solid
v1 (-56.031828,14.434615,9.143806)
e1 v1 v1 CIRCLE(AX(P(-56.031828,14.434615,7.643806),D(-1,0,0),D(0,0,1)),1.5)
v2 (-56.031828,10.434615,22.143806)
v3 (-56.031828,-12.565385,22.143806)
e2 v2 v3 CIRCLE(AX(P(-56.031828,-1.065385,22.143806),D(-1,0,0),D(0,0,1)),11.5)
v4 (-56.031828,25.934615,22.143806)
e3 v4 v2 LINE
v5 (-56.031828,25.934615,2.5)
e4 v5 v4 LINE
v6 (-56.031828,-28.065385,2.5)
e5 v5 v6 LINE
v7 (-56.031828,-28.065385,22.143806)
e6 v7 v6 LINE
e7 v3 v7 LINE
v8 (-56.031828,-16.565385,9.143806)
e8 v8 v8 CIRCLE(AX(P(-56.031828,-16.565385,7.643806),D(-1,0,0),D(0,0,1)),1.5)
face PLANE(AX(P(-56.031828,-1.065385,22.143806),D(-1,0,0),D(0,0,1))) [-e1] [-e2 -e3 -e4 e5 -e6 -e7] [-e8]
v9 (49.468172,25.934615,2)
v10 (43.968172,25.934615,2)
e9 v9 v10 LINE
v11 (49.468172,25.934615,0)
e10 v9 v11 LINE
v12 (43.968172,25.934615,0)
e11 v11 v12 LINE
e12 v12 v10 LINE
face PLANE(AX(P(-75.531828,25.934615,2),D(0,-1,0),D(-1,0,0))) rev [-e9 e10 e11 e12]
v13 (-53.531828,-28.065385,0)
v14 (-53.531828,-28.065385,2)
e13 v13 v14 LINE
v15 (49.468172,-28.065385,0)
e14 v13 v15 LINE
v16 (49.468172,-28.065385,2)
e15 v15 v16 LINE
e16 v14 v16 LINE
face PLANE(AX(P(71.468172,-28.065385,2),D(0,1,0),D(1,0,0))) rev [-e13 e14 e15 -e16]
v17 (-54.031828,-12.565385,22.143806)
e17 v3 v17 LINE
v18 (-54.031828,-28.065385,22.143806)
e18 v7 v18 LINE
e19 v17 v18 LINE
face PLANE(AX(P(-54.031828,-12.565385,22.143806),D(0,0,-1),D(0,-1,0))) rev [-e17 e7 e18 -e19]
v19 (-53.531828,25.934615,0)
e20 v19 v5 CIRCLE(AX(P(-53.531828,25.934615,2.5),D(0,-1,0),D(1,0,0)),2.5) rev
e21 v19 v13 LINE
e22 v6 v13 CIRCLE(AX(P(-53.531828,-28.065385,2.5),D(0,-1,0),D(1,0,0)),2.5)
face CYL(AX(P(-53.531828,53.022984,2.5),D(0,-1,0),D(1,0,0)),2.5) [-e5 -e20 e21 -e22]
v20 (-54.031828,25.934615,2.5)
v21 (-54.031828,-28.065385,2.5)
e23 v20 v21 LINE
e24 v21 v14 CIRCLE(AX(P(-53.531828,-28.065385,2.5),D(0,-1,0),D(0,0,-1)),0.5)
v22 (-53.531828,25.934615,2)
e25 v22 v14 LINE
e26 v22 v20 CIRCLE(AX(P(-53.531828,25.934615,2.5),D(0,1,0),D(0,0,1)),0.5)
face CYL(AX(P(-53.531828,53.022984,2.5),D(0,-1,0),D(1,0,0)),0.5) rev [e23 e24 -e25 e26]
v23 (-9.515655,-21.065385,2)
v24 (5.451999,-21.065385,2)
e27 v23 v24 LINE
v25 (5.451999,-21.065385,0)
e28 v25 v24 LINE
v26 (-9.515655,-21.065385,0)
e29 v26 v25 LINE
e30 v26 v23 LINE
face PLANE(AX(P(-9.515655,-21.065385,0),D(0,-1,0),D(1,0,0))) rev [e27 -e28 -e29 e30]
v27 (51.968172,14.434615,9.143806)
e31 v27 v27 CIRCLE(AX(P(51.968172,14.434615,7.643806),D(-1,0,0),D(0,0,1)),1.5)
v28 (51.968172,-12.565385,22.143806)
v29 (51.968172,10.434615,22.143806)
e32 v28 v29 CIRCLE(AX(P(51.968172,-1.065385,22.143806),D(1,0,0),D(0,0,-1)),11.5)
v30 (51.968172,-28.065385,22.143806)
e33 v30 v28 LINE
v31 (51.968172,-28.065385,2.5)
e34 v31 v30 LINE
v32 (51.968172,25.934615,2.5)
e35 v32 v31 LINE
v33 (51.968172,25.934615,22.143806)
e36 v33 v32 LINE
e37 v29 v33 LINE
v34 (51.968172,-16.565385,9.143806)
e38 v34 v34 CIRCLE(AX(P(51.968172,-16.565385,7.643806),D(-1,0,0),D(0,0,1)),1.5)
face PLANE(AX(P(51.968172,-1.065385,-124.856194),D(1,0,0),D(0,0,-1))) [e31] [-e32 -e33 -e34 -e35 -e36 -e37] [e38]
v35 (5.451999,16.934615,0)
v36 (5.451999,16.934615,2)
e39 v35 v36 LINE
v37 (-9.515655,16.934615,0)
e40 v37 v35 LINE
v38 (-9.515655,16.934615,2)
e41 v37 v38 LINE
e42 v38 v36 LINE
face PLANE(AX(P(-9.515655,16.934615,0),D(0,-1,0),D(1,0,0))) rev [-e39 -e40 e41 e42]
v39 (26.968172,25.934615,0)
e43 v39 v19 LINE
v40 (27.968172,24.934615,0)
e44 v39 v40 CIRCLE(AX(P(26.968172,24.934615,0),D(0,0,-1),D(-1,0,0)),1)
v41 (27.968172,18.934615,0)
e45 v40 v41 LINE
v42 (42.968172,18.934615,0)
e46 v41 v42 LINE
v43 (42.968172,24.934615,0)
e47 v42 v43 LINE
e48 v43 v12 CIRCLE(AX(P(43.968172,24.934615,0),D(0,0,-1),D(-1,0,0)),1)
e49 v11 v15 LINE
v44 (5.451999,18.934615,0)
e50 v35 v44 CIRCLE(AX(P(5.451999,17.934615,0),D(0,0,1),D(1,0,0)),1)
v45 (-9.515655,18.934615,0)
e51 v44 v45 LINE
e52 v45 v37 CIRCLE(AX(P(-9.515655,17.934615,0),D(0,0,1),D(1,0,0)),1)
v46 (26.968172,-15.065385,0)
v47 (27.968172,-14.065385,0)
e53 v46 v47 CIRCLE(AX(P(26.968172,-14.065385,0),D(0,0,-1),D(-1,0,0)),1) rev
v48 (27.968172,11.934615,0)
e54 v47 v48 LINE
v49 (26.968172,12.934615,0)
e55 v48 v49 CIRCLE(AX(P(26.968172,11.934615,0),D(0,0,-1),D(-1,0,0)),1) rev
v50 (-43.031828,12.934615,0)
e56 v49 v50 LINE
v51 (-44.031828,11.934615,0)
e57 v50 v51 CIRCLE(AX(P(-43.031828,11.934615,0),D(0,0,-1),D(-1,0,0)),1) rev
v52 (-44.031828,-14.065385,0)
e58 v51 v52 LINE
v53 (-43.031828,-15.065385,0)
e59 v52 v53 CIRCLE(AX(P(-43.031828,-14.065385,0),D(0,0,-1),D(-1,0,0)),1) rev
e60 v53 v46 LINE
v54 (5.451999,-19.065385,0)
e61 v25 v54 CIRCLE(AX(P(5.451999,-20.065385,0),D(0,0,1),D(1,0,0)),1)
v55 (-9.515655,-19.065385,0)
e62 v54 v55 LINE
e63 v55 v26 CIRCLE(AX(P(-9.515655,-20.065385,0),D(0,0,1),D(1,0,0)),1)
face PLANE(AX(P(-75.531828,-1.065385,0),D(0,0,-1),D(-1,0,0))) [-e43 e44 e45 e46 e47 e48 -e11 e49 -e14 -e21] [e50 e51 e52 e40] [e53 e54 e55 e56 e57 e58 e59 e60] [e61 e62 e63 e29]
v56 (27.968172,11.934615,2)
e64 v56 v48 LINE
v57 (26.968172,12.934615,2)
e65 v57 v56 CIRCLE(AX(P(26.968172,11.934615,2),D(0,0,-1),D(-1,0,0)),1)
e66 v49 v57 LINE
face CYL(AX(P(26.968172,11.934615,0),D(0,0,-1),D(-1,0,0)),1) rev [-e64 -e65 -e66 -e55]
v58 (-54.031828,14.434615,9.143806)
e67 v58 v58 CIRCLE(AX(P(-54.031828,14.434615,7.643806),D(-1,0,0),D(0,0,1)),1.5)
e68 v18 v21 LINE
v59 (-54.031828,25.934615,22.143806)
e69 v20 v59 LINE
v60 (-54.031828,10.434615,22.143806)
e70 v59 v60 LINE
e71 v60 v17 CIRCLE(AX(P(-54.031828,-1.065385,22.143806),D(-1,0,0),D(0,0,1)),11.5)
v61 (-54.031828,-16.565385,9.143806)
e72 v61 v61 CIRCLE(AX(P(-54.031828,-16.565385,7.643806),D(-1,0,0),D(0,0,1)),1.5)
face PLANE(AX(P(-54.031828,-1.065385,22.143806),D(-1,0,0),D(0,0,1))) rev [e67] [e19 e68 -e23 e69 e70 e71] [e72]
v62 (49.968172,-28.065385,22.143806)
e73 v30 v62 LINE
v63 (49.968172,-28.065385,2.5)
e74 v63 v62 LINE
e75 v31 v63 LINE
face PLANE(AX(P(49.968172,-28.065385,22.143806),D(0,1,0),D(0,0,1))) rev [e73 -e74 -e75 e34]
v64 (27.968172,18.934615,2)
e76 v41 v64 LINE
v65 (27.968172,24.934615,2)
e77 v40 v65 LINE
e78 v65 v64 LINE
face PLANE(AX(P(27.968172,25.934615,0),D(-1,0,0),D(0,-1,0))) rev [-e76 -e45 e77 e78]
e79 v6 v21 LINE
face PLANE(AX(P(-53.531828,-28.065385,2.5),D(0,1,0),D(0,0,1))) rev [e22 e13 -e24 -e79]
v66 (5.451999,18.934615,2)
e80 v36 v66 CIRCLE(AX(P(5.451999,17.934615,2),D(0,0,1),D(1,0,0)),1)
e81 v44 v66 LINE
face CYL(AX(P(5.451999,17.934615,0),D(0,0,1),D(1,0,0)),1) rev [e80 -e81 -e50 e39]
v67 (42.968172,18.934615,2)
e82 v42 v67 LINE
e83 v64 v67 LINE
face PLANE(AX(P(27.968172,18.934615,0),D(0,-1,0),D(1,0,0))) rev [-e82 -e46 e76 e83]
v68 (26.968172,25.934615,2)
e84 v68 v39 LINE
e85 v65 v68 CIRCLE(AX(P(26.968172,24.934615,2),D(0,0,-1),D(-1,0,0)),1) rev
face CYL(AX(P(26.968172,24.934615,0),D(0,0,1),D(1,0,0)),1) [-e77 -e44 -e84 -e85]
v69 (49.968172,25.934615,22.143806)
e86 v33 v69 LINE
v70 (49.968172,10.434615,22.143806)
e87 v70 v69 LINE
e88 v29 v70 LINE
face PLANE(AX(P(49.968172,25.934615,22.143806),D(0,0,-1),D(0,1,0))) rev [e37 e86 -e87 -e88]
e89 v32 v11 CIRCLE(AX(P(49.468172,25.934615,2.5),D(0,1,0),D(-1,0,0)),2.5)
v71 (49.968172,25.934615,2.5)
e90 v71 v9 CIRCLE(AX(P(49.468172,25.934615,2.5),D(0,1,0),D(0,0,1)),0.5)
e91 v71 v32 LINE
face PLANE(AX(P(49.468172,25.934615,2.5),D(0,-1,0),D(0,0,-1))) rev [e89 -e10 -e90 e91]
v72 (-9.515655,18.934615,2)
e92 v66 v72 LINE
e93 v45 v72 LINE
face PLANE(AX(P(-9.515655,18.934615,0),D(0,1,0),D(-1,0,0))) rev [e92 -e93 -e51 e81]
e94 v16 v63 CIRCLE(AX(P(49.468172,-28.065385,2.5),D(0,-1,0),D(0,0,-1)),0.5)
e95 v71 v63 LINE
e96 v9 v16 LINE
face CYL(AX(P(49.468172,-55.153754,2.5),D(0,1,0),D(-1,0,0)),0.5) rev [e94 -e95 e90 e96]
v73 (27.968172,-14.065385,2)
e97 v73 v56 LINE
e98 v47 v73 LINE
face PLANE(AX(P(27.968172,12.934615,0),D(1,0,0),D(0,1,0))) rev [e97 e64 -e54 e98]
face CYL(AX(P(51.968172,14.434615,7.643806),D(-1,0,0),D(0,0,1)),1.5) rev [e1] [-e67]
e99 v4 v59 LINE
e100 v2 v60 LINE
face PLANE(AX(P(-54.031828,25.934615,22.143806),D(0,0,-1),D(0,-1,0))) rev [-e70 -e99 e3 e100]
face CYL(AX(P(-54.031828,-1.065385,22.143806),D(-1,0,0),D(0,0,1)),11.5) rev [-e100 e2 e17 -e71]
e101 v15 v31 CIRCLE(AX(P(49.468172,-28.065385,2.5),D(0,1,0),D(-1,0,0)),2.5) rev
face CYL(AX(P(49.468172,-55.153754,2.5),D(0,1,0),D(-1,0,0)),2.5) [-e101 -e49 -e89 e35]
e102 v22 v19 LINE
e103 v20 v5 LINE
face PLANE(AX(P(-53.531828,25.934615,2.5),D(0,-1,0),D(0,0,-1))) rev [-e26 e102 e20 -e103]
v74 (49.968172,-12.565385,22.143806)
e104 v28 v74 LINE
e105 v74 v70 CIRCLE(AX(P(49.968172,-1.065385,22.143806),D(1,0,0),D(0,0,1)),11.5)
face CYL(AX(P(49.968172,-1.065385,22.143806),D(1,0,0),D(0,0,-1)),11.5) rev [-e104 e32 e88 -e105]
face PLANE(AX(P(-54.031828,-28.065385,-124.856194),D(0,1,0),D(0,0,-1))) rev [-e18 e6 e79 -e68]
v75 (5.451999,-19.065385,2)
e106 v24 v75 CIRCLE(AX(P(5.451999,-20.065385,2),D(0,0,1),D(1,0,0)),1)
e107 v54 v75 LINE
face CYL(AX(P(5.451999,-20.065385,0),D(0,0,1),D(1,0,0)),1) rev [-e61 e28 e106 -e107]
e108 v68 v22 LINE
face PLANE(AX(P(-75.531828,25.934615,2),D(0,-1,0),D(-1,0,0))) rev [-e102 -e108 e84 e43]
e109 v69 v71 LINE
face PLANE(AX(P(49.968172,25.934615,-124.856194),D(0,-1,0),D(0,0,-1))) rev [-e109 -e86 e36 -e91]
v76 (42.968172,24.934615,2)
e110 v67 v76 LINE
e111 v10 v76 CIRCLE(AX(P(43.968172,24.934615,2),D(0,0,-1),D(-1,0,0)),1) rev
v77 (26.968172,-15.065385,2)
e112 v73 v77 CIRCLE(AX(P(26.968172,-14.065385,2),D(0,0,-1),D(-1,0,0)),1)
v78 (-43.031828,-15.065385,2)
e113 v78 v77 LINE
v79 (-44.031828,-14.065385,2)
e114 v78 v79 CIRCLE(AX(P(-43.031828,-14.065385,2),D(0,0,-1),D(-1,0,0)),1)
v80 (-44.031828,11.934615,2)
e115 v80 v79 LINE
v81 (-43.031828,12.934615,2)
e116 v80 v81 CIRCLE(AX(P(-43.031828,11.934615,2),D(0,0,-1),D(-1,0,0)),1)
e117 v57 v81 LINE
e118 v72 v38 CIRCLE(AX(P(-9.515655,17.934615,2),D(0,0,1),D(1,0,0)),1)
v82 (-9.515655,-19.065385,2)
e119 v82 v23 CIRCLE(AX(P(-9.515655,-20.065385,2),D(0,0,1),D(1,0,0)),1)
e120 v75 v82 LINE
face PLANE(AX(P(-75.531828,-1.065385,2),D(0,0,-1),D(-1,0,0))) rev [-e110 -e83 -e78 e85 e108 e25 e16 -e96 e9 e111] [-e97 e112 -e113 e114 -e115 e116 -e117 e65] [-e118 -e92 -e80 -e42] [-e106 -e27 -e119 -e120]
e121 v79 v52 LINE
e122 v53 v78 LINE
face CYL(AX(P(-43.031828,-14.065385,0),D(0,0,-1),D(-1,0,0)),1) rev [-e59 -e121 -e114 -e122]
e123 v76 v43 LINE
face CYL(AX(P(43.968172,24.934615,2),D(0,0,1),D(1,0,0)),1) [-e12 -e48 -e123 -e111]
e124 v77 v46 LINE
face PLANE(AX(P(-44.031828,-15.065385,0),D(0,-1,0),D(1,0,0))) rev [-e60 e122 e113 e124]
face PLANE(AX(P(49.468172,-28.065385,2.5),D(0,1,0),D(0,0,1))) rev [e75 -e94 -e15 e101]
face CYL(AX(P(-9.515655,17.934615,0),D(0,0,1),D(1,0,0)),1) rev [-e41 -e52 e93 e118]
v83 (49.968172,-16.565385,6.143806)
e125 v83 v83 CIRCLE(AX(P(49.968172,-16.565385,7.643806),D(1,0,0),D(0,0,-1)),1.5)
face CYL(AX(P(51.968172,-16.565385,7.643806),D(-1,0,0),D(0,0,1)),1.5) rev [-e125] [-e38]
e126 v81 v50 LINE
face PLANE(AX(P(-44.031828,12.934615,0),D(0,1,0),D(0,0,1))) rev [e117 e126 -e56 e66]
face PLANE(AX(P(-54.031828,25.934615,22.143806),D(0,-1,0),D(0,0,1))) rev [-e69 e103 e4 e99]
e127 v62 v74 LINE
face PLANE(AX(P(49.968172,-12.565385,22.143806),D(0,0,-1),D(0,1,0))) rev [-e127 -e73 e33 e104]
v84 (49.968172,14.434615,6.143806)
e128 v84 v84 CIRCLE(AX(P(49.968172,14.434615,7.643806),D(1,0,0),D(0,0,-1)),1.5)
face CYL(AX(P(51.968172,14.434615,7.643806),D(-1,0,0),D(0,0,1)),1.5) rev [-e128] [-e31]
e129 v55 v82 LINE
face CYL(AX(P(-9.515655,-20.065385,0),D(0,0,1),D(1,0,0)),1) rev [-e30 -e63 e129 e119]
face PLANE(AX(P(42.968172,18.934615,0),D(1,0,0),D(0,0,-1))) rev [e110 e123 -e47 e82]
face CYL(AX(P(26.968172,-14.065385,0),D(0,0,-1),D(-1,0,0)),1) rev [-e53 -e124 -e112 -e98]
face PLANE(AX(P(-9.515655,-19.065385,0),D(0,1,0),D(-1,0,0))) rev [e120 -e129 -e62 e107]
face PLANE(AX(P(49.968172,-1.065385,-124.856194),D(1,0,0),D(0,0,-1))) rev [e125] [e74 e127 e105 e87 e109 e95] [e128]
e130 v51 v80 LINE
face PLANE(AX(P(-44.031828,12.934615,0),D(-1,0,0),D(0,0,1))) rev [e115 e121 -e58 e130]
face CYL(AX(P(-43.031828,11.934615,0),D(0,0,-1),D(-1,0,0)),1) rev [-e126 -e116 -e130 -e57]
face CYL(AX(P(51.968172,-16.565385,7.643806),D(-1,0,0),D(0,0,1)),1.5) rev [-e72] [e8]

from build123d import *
from build123d.topology import SkipClean

# Parameters (mm, degrees)
DODANIE_WYCI_GNI_CIE1_DEPTH = 2
SZKIC_START                 = -28.065385
SZKIC_ZGI_CIA1_DEPTH        = 54
SZKIC_ZGI_CIA1_2_DEPTH      = 15.5
SZKIC_START_2               = 10.434615
SZKIC_ZGI_CIA1_3_DEPTH      = 15.5
SZKIC_START_3               = -56.031828
SZKIC_ZGI_CIA1_4_DEPTH      = 2.423909
SZKIC_START_4               = -12.565385
SZKIC_ZGI_CIA1_5_DEPTH      = 23
SZKIC_ZGI_CIA1_6_DEPTH      = 23
SZKIC_ZGI_CIA2_DEPTH        = 54
SZKIC_ZGI_CIA2_2_DEPTH      = 54
SZKIC_START_5               = 49.968172
SZKIC_ZGI_CIA2_3_DEPTH      = 2
SZKIC9_W                    = 72
SZKIC9_H                    = 28
SZKIC9_W_2                  = 15
SZKIC9_H_2                  = 7
WYTNIJ_WYCI_GNI_CIE1_DEPTH  = 66.825561
SZKIC10_R                   = 1.5
WYTNIJ_WYCI_GNI_CIE2_DEPTH  = 114.762973
ZAOKR_GLENIE2_R             = 1
ZAOKR_GLENIE3_R             = 1


with BuildPart() as part:
    # Szkic1 → Dodanie-wyciągnięcie1 (new body)
    with BuildSketch(Plane.XY):
        with BuildLine():
            Line((-75.531828, 25.934615), (71.468172, 25.934615))
            Line((71.468172, 25.934615), (71.468172, 10.434615))
            ThreePointArc((71.468172, 10.434615), (59.968172, -1.065385), (71.468172, -12.565385))
            Line((71.468172, -12.565385), (71.468172, -28.065385))
            Line((71.468172, -28.065385), (-75.531828, -28.065385))
            Line((-75.531828, -28.065385), (-75.531828, -12.565385))
            ThreePointArc((-75.531828, -12.565385), (-64.031828, -1.065385), (-75.531828, 10.434615))
            Line((-75.531828, 10.434615), (-75.531828, 25.934615))
        make_face()
    extrude(amount=DODANIE_WYCI_GNI_CIE1_DEPTH)

    # Szkic zgięcia1: read off the stored shape, not the designer's step
    # Szkic zgięcia1 outline → Szkic zgięcia1 (cut)
    with BuildSketch(Plane(origin=(0, 0, 0), x_dir=(1, 0, 0), z_dir=(0, 1, 0)).offset(SZKIC_START)):
        with BuildLine():
            Line((-75.531828, -2), (-55.981318, -2))
            ThreePointArc((-55.981318, -2), (-55.112967, -0.563508), (-53.531828, 0))
            Line((-53.531828, 0), (-75.531828, 0))
            Line((-75.531828, 0), (-75.531828, -2))
        make_face()
    extrude(amount=SZKIC_ZGI_CIA1_DEPTH, mode=Mode.SUBTRACT)

    # Szkic zgi_cia1 2 outline → Szkic zgi_cia1 2 (add)
    with BuildSketch(Plane(origin=(0, 0, 0), x_dir=(1, 0, 0), z_dir=(0, 1, 0)).offset(SZKIC_START)):
        with BuildLine():
            ThreePointArc((-55.981318, -2), (-56.019168, -2.248728), (-56.031828, -2.5))
            Line((-56.031828, -2.5), (-56.031828, -22.143806))
            Line((-56.031828, -22.143806), (-54.031828, -22.143806))
            Line((-54.031828, -22.143806), (-54.031828, -2.5))
            ThreePointArc((-54.031828, -2.5), (-53.885381, -2.146447), (-53.531828, -2))
            Line((-53.531828, -2), (-55.981318, -2))
        make_face()
    extrude(amount=SZKIC_ZGI_CIA1_2_DEPTH)

    # Szkic zgi_cia1 3 outline → Szkic zgi_cia1 3 (add)
    with BuildSketch(Plane(origin=(0, 0, 0), x_dir=(1, 0, 0), z_dir=(0, 1, 0)).offset(SZKIC_START_2)):
        with BuildLine():
            ThreePointArc((-55.981318, -2), (-56.019168, -2.248728), (-56.031828, -2.5))
            Line((-56.031828, -2.5), (-56.031828, -22.143806))
            Line((-56.031828, -22.143806), (-54.031828, -22.143806))
            Line((-54.031828, -22.143806), (-54.031828, -2.5))
            ThreePointArc((-54.031828, -2.5), (-53.885381, -2.146447), (-53.531828, -2))
            Line((-53.531828, -2), (-55.981318, -2))
        make_face()
    extrude(amount=SZKIC_ZGI_CIA1_3_DEPTH)

    # Szkic zgi_cia1 4 outline → Szkic zgi_cia1 4 (add)
    with BuildSketch(Plane.YZ.offset(SZKIC_START_3)):
        with BuildLine():
            Line((10.434615, 2), (10.434615, 22.143806))
            ThreePointArc((10.434615, 22.143806), (-1.065385, 10.643806), (-12.565385, 22.143806))
            Line((-12.565385, 22.143806), (-12.565385, 2))
            Line((-12.565385, 2), (10.434615, 2))
        make_face()
    extrude(amount=SZKIC_ZGI_CIA1_4_DEPTH)

    # Szkic zgi_cia1 5 outline → Szkic zgi_cia1 5 (cut)
    with SkipClean():  # the faces are left unmerged after this step: merging them gives an invalid solid
        with BuildSketch(Plane(origin=(0, 0, 0), x_dir=(1, 0, 0), z_dir=(0, 1, 0)).offset(SZKIC_START_4)):
            with BuildLine():
                ThreePointArc((-53.607919, -2.005824), (-53.911331, -2.174459), (-54.031828, -2.5))
                Line((-54.031828, -2.5), (-54.031828, -24))
                Line((-54.031828, -24), (-53.607919, -24))
                Line((-53.607919, -24), (-53.607919, -2.005824))
            make_face()
            with BuildLine():
                Line((-58, -24), (-56.031828, -24))
                Line((-56.031828, -24), (-56.031828, -2.5))
                ThreePointArc((-56.031828, -2.5), (-56.019168, -2.248728), (-55.981318, -2))
                Line((-55.981318, -2), (-58, -2))
                Line((-58, -2), (-58, -24))
            make_face()
        extrude(amount=SZKIC_ZGI_CIA1_5_DEPTH, mode=Mode.SUBTRACT)

    # Szkic zgi_cia1 6 outline → Szkic zgi_cia1 6 (add)
    with SkipClean():  # the faces are left unmerged after this step: merging them gives an invalid solid
        with BuildSketch(Plane(origin=(0, 0, 0), x_dir=(1, 0, 0), z_dir=(0, 1, 0)).offset(SZKIC_START_4)):
            with BuildLine():
                Line((-53.607919, -2), (-53.607919, -2.005824))
                ThreePointArc((-53.607919, -2.005824), (-53.569985, -2.001458), (-53.531828, -2))
                Line((-53.531828, -2), (-53.607919, -2))
            make_face()
        extrude(amount=SZKIC_ZGI_CIA1_6_DEPTH)

    # Szkic zgięcia2: read off the stored shape, not the designer's step
    # Szkic zgięcia2 outline → Szkic zgięcia2 (cut)
    with SkipClean():  # the faces are left unmerged after this step: merging them gives an invalid solid
        with BuildSketch(Plane(origin=(0, 0, 0), x_dir=(1, 0, 0), z_dir=(0, 1, 0)).offset(SZKIC_START)):
            with BuildLine():
                ThreePointArc((49.468172, 0), (51.049311, -0.563508), (51.917662, -2))
                Line((51.917662, -2), (71.468172, -2))
                Line((71.468172, -2), (71.468172, 0))
                Line((71.468172, 0), (49.468172, 0))
            make_face()
        extrude(amount=SZKIC_ZGI_CIA2_DEPTH, mode=Mode.SUBTRACT)

    # Szkic zgi_cia2 2 outline → Szkic zgi_cia2 2 (add)
    with SkipClean():  # the faces are left unmerged after this step: merging them gives an invalid solid
        with BuildSketch(Plane(origin=(0, 0, 0), x_dir=(1, 0, 0), z_dir=(0, 1, 0)).offset(SZKIC_START)):
            with BuildLine():
                Line((49.968172, -22.143806), (51.968172, -22.143806))
                Line((51.968172, -22.143806), (51.968172, -2.5))
                ThreePointArc((51.968172, -2.5), (51.955512, -2.248728), (51.917662, -2))
                Line((51.917662, -2), (49.468172, -2))
                ThreePointArc((49.468172, -2), (49.821725, -2.146447), (49.968172, -2.5))
                Line((49.968172, -2.5), (49.968172, -22.143806))
            make_face()
        extrude(amount=SZKIC_ZGI_CIA2_2_DEPTH)

    # Szkic zgi_cia2 3 outline → Szkic zgi_cia2 3 (cut)
    with SkipClean():  # the faces are left unmerged after this step: merging them gives an invalid solid
        with BuildSketch(Plane.YZ.offset(SZKIC_START_5)):
            with BuildLine():
                Line((10.434615, 22.143806), (-12.565385, 22.143806))
                ThreePointArc((-12.565385, 22.143806), (-1.065385, 10.643806), (10.434615, 22.143806))
            make_face()
        extrude(amount=SZKIC_ZGI_CIA2_3_DEPTH, mode=Mode.SUBTRACT)

    # Szkic9 → Wytnij-wyciągnięcie1 (cut, through all)
    with SkipClean():  # the faces are left unmerged after this step: merging them gives an invalid solid
        with BuildSketch(Plane.XY.offset(2)):
            with Locations((-8.031828, -1.065385)):
                Rectangle(SZKIC9_W, SZKIC9_H)
            with Locations((35.468172, 22.434615)):
                Rectangle(SZKIC9_W_2, SZKIC9_H_2)
            with BuildLine():
                Line((-9.515655, 18.934615), (5.451999, 18.934615))
                ThreePointArc((5.451999, 18.934615), (6.451999, 17.934615), (5.451999, 16.934615))
                Line((5.451999, 16.934615), (-9.515655, 16.934615))
                ThreePointArc((-9.515655, 16.934615), (-10.515655, 17.934615), (-9.515655, 18.934615))
            make_face()
            with BuildLine():
                Line((-9.515655, -19.065385), (5.451999, -19.065385))
                ThreePointArc((5.451999, -19.065385), (6.451999, -20.065385), (5.451999, -21.065385))
                Line((5.451999, -21.065385), (-9.515655, -21.065385))
                ThreePointArc((-9.515655, -21.065385), (-10.515655, -20.065385), (-9.515655, -19.065385))
            make_face()
        extrude(amount=-WYTNIJ_WYCI_GNI_CIE1_DEPTH, mode=Mode.SUBTRACT)

    # Szkic10 → Wytnij-wyciągnięcie2 (cut, through all)
    with SkipClean():  # the faces are left unmerged after this step: merging them gives an invalid solid
        with BuildSketch(Plane.ZY.offset(56.031828)):
            with Locations((7.643806, 14.434615)):
                Circle(SZKIC10_R)
            with Locations((7.643806, -16.565385)):
                Circle(SZKIC10_R)
        extrude(amount=-WYTNIJ_WYCI_GNI_CIE2_DEPTH, mode=Mode.SUBTRACT)

    # Zaokrąglenie2
    zaokr_glenie2_edges = [part.edges().sort_by_distance(p)[0] for p in [
        (27.968172, 25.934615, 1),
        (42.968172, 25.934615, 1),
    ]]
    fillet(zaokr_glenie2_edges, radius=ZAOKR_GLENIE2_R)

    # Zaokrąglenie3
    zaokr_glenie3_edges = [part.edges().sort_by_distance(p)[0] for p in [
        (-44.031828, -15.065385, 1),
        (-44.031828, 12.934615, 1),
        (27.968172, 12.934615, 1),
        (27.968172, -15.065385, 1),
    ]]
    fillet(zaokr_glenie3_edges, radius=ZAOKR_GLENIE3_R)


solid = part.part
